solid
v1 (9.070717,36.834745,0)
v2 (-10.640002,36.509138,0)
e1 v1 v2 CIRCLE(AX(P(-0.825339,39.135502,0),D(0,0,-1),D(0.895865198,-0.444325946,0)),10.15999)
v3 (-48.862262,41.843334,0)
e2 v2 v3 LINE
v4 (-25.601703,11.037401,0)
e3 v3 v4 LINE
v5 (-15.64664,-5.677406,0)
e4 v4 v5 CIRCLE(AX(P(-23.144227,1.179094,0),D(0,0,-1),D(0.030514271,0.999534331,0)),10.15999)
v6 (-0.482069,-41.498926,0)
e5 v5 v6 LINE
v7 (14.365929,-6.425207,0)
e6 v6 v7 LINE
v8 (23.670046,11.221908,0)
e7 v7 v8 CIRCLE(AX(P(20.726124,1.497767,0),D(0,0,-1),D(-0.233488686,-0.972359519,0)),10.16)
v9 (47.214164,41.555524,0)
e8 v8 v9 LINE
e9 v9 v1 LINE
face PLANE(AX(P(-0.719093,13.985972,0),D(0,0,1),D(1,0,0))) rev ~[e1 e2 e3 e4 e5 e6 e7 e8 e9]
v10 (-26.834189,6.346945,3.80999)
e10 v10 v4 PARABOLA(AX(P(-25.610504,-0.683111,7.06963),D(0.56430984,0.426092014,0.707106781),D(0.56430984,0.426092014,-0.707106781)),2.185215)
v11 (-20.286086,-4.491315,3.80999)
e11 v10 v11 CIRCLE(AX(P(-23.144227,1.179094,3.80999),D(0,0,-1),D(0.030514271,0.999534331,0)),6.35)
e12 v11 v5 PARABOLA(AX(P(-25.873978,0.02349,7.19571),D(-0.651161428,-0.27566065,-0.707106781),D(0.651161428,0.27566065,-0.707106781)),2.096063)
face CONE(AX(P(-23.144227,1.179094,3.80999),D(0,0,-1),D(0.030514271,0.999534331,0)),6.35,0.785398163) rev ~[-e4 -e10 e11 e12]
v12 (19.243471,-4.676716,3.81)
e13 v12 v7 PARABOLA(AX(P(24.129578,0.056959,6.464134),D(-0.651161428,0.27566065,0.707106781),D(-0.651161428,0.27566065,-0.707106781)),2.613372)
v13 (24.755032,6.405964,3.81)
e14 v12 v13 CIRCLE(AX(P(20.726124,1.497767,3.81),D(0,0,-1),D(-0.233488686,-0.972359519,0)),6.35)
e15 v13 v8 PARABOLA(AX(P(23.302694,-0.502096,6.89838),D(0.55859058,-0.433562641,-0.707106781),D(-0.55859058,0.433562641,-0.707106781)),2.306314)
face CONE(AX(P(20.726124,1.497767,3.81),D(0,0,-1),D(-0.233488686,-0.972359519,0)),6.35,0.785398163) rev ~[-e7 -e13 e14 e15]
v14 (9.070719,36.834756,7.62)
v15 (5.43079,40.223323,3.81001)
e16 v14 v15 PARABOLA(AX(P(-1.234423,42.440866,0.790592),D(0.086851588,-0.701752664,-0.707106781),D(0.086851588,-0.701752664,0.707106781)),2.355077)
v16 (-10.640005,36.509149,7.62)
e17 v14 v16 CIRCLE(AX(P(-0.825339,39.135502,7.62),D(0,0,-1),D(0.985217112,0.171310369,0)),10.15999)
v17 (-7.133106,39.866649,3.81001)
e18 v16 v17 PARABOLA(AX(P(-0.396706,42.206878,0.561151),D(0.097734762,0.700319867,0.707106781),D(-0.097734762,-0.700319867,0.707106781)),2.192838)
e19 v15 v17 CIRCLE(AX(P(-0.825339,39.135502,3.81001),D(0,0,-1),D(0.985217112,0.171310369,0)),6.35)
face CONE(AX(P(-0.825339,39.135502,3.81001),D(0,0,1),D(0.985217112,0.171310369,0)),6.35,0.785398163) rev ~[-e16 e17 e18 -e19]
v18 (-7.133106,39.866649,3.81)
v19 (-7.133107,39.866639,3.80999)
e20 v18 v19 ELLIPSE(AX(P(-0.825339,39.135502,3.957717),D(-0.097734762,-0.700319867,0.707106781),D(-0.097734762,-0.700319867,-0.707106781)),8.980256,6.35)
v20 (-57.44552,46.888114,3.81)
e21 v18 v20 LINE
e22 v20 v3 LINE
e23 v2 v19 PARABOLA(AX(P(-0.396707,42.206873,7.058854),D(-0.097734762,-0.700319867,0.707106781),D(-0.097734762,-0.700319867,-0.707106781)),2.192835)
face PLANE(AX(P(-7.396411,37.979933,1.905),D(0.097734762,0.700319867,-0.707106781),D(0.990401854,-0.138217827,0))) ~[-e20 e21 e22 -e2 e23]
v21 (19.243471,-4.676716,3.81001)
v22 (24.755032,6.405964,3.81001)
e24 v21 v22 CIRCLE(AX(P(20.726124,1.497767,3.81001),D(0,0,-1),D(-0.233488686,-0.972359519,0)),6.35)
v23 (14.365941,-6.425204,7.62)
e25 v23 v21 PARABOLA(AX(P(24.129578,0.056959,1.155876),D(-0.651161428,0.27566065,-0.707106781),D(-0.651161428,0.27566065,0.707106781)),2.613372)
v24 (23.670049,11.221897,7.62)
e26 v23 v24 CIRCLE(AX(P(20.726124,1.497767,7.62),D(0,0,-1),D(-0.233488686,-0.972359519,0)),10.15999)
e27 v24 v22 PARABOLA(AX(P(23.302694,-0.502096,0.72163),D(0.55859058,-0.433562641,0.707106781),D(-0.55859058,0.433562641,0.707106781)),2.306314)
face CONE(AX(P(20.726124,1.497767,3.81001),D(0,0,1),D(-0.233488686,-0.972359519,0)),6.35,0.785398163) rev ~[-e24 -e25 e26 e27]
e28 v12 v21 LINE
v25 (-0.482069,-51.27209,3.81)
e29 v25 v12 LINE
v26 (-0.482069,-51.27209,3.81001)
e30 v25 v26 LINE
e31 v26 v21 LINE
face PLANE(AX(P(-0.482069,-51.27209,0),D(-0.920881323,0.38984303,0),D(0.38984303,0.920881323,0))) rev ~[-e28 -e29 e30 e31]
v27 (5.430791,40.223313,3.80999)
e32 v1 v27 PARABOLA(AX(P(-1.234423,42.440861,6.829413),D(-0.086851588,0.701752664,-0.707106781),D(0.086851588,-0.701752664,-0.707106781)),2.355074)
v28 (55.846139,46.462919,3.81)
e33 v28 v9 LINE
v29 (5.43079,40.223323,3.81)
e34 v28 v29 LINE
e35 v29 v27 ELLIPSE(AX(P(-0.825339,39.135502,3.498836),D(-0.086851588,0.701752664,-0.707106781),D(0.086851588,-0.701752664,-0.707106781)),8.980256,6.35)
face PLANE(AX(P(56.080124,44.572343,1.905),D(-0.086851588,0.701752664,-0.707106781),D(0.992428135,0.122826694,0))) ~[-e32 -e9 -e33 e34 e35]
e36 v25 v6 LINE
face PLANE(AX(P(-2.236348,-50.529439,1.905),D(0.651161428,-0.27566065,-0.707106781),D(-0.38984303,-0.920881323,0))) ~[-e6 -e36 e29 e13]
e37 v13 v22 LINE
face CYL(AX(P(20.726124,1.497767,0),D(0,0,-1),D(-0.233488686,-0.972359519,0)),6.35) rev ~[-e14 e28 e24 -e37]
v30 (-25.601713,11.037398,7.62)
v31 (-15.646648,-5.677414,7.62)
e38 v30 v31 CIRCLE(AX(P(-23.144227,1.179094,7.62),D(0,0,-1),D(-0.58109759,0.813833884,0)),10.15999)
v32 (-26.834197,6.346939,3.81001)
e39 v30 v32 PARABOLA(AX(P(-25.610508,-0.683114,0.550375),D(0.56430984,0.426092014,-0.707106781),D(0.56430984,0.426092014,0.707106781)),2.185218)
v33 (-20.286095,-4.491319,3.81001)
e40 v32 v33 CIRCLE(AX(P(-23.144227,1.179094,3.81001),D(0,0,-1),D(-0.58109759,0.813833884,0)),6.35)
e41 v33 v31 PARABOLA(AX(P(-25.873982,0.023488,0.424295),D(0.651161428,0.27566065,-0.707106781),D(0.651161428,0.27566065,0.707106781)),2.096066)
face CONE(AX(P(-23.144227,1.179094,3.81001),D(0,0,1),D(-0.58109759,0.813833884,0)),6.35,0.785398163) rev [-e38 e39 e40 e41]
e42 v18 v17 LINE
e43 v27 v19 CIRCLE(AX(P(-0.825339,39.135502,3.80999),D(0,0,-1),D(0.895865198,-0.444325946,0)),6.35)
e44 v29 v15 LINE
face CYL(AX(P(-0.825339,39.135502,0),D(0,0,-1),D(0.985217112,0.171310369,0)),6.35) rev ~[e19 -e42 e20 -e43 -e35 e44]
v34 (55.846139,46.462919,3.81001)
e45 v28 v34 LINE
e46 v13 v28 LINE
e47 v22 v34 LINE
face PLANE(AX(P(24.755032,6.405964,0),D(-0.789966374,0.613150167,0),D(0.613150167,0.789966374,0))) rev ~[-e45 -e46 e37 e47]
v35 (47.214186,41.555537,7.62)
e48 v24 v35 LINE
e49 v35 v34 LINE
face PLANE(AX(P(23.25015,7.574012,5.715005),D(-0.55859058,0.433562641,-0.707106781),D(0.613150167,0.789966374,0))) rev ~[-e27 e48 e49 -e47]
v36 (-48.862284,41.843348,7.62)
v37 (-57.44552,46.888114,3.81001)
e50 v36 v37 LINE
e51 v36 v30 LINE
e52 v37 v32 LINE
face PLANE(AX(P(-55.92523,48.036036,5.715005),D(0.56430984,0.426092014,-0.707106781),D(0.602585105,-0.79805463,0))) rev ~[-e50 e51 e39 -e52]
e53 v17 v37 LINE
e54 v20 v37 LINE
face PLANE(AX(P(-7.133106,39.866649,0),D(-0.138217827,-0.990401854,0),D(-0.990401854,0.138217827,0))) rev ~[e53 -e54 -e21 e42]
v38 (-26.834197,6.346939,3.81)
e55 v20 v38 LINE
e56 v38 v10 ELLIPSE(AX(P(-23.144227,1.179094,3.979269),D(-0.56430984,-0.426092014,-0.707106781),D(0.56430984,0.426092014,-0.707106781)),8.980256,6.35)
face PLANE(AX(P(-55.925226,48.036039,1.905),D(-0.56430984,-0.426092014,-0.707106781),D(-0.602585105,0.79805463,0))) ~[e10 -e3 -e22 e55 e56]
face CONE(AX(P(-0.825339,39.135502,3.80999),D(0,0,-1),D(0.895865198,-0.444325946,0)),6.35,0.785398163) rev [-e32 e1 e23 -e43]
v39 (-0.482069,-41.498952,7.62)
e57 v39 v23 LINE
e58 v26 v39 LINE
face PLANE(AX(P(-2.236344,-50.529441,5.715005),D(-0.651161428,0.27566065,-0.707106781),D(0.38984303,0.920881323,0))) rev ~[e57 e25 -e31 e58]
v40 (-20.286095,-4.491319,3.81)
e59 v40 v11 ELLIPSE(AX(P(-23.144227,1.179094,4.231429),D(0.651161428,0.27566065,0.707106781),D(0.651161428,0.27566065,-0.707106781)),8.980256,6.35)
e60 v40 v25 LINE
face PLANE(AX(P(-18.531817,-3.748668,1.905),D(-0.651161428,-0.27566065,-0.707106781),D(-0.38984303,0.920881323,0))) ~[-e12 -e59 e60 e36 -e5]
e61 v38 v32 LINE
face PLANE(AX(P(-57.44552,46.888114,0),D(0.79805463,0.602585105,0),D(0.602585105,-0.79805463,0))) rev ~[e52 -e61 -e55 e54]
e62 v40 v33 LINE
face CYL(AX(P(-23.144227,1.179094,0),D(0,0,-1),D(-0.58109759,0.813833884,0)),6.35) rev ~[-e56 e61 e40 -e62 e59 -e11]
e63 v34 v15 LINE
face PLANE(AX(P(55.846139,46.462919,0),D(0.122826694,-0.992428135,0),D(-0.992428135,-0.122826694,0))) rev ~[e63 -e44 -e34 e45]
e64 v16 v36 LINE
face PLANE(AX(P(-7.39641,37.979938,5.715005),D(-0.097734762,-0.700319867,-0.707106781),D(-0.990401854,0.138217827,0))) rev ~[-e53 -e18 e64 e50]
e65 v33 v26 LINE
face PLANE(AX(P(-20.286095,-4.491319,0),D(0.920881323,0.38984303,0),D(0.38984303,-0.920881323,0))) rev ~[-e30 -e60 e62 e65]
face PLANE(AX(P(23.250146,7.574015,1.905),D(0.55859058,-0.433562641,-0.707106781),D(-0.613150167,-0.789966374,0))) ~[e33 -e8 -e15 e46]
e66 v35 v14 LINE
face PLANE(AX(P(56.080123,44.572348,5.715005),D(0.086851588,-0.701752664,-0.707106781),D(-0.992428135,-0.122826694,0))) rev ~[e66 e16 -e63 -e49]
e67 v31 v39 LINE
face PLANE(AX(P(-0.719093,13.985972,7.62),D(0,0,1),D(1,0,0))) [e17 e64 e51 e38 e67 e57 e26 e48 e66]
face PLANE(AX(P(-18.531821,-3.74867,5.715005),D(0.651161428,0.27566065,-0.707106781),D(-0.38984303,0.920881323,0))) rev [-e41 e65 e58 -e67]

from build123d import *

# Parameters (mm, degrees)
F1_DEPTH = 7.62
F2_SIZE  = 3.81
F3_SIZE  = 3.80999


# Not quite as in the source:
# - a fillet or chamfer is up to 0.001 mm smaller than in the source, because OpenCascade refuses the exact size
# - a feature names something its author has since deleted; it is built from what else it names


with BuildPart() as f1:
    # F0 (on Top) → F1 (new body)
    with BuildSketch(Plane.XY):
        with BuildLine():
            Line((-20.2860954264, -4.4913191196), (-0.4820694779, -51.2720903428))
            Line((-0.4820694779, -51.2720903428), (19.2434711163, -4.6767160388))
            ThreePointArc((19.2434711163, -4.6767160388), (15.0404138493, 4.3253448413), (24.7550324356, 6.4059640289))
            Line((24.7550324356, 6.4059640289), (55.8461389062, 46.4629190132))
            Line((55.8461389062, 46.4629190132), (5.4307896441, 40.2233229702))
            ThreePointArc((5.4307896441, 40.2233229702), (-0.645142483, 32.7880593977), (-7.1331060464, 39.8666485513))
            Line((-7.1331060464, 39.8666485513), (-57.4455202297, 46.8881141422))
            Line((-57.4455202297, 46.8881141422), (-26.8341969161, 6.3469389621))
            ThreePointArc((-26.8341969161, 6.3469389621), (-17.7091606963, 4.4627734196), (-20.2860954264, -4.4913191196))
        make_face()
    extrude(amount=F1_DEPTH)

    # F2
    f2_edges = [f1.edges().sort_by_distance(p)[0] for p in [
        (-32.289313, 43.377381, 0),
        (30.638464, 43.343121, 0),
        (-42.139859, 26.617527, 0),
        (40.300586, 26.434442, 0),
        (9.380701, -27.974403, 0),
        (-10.384082, -27.881705, 0),
        (15.040414, 4.325345, 0),
    ]]
    chamfer(f2_edges, length=F2_SIZE)

    # F3 (size 3.81 in the source; OpenCascade refuses exactly that, so slightly less here)
    f3_edges = [f1.edges().sort_by_distance(p)[0] for p in [
        (-32.289313, 43.377381, 7.62),
        (-42.139859, 26.617527, 7.62),
        (-10.384082, -27.881705, 7.62),
        (9.380701, -27.974403, 7.62),
        (40.300586, 26.434442, 7.62),
        (30.638464, 43.343121, 7.62),
        (15.040414, 4.325345, 7.62),
        (-0.645142, 32.788059, 7.62),
        (-17.709161, 4.462773, 7.62),
        (-17.729481, 4.496175, 0),
        (-0.591, 32.789828, 0),
    ]]
    chamfer(f3_edges, length=F3_SIZE)


solid = f1.part
